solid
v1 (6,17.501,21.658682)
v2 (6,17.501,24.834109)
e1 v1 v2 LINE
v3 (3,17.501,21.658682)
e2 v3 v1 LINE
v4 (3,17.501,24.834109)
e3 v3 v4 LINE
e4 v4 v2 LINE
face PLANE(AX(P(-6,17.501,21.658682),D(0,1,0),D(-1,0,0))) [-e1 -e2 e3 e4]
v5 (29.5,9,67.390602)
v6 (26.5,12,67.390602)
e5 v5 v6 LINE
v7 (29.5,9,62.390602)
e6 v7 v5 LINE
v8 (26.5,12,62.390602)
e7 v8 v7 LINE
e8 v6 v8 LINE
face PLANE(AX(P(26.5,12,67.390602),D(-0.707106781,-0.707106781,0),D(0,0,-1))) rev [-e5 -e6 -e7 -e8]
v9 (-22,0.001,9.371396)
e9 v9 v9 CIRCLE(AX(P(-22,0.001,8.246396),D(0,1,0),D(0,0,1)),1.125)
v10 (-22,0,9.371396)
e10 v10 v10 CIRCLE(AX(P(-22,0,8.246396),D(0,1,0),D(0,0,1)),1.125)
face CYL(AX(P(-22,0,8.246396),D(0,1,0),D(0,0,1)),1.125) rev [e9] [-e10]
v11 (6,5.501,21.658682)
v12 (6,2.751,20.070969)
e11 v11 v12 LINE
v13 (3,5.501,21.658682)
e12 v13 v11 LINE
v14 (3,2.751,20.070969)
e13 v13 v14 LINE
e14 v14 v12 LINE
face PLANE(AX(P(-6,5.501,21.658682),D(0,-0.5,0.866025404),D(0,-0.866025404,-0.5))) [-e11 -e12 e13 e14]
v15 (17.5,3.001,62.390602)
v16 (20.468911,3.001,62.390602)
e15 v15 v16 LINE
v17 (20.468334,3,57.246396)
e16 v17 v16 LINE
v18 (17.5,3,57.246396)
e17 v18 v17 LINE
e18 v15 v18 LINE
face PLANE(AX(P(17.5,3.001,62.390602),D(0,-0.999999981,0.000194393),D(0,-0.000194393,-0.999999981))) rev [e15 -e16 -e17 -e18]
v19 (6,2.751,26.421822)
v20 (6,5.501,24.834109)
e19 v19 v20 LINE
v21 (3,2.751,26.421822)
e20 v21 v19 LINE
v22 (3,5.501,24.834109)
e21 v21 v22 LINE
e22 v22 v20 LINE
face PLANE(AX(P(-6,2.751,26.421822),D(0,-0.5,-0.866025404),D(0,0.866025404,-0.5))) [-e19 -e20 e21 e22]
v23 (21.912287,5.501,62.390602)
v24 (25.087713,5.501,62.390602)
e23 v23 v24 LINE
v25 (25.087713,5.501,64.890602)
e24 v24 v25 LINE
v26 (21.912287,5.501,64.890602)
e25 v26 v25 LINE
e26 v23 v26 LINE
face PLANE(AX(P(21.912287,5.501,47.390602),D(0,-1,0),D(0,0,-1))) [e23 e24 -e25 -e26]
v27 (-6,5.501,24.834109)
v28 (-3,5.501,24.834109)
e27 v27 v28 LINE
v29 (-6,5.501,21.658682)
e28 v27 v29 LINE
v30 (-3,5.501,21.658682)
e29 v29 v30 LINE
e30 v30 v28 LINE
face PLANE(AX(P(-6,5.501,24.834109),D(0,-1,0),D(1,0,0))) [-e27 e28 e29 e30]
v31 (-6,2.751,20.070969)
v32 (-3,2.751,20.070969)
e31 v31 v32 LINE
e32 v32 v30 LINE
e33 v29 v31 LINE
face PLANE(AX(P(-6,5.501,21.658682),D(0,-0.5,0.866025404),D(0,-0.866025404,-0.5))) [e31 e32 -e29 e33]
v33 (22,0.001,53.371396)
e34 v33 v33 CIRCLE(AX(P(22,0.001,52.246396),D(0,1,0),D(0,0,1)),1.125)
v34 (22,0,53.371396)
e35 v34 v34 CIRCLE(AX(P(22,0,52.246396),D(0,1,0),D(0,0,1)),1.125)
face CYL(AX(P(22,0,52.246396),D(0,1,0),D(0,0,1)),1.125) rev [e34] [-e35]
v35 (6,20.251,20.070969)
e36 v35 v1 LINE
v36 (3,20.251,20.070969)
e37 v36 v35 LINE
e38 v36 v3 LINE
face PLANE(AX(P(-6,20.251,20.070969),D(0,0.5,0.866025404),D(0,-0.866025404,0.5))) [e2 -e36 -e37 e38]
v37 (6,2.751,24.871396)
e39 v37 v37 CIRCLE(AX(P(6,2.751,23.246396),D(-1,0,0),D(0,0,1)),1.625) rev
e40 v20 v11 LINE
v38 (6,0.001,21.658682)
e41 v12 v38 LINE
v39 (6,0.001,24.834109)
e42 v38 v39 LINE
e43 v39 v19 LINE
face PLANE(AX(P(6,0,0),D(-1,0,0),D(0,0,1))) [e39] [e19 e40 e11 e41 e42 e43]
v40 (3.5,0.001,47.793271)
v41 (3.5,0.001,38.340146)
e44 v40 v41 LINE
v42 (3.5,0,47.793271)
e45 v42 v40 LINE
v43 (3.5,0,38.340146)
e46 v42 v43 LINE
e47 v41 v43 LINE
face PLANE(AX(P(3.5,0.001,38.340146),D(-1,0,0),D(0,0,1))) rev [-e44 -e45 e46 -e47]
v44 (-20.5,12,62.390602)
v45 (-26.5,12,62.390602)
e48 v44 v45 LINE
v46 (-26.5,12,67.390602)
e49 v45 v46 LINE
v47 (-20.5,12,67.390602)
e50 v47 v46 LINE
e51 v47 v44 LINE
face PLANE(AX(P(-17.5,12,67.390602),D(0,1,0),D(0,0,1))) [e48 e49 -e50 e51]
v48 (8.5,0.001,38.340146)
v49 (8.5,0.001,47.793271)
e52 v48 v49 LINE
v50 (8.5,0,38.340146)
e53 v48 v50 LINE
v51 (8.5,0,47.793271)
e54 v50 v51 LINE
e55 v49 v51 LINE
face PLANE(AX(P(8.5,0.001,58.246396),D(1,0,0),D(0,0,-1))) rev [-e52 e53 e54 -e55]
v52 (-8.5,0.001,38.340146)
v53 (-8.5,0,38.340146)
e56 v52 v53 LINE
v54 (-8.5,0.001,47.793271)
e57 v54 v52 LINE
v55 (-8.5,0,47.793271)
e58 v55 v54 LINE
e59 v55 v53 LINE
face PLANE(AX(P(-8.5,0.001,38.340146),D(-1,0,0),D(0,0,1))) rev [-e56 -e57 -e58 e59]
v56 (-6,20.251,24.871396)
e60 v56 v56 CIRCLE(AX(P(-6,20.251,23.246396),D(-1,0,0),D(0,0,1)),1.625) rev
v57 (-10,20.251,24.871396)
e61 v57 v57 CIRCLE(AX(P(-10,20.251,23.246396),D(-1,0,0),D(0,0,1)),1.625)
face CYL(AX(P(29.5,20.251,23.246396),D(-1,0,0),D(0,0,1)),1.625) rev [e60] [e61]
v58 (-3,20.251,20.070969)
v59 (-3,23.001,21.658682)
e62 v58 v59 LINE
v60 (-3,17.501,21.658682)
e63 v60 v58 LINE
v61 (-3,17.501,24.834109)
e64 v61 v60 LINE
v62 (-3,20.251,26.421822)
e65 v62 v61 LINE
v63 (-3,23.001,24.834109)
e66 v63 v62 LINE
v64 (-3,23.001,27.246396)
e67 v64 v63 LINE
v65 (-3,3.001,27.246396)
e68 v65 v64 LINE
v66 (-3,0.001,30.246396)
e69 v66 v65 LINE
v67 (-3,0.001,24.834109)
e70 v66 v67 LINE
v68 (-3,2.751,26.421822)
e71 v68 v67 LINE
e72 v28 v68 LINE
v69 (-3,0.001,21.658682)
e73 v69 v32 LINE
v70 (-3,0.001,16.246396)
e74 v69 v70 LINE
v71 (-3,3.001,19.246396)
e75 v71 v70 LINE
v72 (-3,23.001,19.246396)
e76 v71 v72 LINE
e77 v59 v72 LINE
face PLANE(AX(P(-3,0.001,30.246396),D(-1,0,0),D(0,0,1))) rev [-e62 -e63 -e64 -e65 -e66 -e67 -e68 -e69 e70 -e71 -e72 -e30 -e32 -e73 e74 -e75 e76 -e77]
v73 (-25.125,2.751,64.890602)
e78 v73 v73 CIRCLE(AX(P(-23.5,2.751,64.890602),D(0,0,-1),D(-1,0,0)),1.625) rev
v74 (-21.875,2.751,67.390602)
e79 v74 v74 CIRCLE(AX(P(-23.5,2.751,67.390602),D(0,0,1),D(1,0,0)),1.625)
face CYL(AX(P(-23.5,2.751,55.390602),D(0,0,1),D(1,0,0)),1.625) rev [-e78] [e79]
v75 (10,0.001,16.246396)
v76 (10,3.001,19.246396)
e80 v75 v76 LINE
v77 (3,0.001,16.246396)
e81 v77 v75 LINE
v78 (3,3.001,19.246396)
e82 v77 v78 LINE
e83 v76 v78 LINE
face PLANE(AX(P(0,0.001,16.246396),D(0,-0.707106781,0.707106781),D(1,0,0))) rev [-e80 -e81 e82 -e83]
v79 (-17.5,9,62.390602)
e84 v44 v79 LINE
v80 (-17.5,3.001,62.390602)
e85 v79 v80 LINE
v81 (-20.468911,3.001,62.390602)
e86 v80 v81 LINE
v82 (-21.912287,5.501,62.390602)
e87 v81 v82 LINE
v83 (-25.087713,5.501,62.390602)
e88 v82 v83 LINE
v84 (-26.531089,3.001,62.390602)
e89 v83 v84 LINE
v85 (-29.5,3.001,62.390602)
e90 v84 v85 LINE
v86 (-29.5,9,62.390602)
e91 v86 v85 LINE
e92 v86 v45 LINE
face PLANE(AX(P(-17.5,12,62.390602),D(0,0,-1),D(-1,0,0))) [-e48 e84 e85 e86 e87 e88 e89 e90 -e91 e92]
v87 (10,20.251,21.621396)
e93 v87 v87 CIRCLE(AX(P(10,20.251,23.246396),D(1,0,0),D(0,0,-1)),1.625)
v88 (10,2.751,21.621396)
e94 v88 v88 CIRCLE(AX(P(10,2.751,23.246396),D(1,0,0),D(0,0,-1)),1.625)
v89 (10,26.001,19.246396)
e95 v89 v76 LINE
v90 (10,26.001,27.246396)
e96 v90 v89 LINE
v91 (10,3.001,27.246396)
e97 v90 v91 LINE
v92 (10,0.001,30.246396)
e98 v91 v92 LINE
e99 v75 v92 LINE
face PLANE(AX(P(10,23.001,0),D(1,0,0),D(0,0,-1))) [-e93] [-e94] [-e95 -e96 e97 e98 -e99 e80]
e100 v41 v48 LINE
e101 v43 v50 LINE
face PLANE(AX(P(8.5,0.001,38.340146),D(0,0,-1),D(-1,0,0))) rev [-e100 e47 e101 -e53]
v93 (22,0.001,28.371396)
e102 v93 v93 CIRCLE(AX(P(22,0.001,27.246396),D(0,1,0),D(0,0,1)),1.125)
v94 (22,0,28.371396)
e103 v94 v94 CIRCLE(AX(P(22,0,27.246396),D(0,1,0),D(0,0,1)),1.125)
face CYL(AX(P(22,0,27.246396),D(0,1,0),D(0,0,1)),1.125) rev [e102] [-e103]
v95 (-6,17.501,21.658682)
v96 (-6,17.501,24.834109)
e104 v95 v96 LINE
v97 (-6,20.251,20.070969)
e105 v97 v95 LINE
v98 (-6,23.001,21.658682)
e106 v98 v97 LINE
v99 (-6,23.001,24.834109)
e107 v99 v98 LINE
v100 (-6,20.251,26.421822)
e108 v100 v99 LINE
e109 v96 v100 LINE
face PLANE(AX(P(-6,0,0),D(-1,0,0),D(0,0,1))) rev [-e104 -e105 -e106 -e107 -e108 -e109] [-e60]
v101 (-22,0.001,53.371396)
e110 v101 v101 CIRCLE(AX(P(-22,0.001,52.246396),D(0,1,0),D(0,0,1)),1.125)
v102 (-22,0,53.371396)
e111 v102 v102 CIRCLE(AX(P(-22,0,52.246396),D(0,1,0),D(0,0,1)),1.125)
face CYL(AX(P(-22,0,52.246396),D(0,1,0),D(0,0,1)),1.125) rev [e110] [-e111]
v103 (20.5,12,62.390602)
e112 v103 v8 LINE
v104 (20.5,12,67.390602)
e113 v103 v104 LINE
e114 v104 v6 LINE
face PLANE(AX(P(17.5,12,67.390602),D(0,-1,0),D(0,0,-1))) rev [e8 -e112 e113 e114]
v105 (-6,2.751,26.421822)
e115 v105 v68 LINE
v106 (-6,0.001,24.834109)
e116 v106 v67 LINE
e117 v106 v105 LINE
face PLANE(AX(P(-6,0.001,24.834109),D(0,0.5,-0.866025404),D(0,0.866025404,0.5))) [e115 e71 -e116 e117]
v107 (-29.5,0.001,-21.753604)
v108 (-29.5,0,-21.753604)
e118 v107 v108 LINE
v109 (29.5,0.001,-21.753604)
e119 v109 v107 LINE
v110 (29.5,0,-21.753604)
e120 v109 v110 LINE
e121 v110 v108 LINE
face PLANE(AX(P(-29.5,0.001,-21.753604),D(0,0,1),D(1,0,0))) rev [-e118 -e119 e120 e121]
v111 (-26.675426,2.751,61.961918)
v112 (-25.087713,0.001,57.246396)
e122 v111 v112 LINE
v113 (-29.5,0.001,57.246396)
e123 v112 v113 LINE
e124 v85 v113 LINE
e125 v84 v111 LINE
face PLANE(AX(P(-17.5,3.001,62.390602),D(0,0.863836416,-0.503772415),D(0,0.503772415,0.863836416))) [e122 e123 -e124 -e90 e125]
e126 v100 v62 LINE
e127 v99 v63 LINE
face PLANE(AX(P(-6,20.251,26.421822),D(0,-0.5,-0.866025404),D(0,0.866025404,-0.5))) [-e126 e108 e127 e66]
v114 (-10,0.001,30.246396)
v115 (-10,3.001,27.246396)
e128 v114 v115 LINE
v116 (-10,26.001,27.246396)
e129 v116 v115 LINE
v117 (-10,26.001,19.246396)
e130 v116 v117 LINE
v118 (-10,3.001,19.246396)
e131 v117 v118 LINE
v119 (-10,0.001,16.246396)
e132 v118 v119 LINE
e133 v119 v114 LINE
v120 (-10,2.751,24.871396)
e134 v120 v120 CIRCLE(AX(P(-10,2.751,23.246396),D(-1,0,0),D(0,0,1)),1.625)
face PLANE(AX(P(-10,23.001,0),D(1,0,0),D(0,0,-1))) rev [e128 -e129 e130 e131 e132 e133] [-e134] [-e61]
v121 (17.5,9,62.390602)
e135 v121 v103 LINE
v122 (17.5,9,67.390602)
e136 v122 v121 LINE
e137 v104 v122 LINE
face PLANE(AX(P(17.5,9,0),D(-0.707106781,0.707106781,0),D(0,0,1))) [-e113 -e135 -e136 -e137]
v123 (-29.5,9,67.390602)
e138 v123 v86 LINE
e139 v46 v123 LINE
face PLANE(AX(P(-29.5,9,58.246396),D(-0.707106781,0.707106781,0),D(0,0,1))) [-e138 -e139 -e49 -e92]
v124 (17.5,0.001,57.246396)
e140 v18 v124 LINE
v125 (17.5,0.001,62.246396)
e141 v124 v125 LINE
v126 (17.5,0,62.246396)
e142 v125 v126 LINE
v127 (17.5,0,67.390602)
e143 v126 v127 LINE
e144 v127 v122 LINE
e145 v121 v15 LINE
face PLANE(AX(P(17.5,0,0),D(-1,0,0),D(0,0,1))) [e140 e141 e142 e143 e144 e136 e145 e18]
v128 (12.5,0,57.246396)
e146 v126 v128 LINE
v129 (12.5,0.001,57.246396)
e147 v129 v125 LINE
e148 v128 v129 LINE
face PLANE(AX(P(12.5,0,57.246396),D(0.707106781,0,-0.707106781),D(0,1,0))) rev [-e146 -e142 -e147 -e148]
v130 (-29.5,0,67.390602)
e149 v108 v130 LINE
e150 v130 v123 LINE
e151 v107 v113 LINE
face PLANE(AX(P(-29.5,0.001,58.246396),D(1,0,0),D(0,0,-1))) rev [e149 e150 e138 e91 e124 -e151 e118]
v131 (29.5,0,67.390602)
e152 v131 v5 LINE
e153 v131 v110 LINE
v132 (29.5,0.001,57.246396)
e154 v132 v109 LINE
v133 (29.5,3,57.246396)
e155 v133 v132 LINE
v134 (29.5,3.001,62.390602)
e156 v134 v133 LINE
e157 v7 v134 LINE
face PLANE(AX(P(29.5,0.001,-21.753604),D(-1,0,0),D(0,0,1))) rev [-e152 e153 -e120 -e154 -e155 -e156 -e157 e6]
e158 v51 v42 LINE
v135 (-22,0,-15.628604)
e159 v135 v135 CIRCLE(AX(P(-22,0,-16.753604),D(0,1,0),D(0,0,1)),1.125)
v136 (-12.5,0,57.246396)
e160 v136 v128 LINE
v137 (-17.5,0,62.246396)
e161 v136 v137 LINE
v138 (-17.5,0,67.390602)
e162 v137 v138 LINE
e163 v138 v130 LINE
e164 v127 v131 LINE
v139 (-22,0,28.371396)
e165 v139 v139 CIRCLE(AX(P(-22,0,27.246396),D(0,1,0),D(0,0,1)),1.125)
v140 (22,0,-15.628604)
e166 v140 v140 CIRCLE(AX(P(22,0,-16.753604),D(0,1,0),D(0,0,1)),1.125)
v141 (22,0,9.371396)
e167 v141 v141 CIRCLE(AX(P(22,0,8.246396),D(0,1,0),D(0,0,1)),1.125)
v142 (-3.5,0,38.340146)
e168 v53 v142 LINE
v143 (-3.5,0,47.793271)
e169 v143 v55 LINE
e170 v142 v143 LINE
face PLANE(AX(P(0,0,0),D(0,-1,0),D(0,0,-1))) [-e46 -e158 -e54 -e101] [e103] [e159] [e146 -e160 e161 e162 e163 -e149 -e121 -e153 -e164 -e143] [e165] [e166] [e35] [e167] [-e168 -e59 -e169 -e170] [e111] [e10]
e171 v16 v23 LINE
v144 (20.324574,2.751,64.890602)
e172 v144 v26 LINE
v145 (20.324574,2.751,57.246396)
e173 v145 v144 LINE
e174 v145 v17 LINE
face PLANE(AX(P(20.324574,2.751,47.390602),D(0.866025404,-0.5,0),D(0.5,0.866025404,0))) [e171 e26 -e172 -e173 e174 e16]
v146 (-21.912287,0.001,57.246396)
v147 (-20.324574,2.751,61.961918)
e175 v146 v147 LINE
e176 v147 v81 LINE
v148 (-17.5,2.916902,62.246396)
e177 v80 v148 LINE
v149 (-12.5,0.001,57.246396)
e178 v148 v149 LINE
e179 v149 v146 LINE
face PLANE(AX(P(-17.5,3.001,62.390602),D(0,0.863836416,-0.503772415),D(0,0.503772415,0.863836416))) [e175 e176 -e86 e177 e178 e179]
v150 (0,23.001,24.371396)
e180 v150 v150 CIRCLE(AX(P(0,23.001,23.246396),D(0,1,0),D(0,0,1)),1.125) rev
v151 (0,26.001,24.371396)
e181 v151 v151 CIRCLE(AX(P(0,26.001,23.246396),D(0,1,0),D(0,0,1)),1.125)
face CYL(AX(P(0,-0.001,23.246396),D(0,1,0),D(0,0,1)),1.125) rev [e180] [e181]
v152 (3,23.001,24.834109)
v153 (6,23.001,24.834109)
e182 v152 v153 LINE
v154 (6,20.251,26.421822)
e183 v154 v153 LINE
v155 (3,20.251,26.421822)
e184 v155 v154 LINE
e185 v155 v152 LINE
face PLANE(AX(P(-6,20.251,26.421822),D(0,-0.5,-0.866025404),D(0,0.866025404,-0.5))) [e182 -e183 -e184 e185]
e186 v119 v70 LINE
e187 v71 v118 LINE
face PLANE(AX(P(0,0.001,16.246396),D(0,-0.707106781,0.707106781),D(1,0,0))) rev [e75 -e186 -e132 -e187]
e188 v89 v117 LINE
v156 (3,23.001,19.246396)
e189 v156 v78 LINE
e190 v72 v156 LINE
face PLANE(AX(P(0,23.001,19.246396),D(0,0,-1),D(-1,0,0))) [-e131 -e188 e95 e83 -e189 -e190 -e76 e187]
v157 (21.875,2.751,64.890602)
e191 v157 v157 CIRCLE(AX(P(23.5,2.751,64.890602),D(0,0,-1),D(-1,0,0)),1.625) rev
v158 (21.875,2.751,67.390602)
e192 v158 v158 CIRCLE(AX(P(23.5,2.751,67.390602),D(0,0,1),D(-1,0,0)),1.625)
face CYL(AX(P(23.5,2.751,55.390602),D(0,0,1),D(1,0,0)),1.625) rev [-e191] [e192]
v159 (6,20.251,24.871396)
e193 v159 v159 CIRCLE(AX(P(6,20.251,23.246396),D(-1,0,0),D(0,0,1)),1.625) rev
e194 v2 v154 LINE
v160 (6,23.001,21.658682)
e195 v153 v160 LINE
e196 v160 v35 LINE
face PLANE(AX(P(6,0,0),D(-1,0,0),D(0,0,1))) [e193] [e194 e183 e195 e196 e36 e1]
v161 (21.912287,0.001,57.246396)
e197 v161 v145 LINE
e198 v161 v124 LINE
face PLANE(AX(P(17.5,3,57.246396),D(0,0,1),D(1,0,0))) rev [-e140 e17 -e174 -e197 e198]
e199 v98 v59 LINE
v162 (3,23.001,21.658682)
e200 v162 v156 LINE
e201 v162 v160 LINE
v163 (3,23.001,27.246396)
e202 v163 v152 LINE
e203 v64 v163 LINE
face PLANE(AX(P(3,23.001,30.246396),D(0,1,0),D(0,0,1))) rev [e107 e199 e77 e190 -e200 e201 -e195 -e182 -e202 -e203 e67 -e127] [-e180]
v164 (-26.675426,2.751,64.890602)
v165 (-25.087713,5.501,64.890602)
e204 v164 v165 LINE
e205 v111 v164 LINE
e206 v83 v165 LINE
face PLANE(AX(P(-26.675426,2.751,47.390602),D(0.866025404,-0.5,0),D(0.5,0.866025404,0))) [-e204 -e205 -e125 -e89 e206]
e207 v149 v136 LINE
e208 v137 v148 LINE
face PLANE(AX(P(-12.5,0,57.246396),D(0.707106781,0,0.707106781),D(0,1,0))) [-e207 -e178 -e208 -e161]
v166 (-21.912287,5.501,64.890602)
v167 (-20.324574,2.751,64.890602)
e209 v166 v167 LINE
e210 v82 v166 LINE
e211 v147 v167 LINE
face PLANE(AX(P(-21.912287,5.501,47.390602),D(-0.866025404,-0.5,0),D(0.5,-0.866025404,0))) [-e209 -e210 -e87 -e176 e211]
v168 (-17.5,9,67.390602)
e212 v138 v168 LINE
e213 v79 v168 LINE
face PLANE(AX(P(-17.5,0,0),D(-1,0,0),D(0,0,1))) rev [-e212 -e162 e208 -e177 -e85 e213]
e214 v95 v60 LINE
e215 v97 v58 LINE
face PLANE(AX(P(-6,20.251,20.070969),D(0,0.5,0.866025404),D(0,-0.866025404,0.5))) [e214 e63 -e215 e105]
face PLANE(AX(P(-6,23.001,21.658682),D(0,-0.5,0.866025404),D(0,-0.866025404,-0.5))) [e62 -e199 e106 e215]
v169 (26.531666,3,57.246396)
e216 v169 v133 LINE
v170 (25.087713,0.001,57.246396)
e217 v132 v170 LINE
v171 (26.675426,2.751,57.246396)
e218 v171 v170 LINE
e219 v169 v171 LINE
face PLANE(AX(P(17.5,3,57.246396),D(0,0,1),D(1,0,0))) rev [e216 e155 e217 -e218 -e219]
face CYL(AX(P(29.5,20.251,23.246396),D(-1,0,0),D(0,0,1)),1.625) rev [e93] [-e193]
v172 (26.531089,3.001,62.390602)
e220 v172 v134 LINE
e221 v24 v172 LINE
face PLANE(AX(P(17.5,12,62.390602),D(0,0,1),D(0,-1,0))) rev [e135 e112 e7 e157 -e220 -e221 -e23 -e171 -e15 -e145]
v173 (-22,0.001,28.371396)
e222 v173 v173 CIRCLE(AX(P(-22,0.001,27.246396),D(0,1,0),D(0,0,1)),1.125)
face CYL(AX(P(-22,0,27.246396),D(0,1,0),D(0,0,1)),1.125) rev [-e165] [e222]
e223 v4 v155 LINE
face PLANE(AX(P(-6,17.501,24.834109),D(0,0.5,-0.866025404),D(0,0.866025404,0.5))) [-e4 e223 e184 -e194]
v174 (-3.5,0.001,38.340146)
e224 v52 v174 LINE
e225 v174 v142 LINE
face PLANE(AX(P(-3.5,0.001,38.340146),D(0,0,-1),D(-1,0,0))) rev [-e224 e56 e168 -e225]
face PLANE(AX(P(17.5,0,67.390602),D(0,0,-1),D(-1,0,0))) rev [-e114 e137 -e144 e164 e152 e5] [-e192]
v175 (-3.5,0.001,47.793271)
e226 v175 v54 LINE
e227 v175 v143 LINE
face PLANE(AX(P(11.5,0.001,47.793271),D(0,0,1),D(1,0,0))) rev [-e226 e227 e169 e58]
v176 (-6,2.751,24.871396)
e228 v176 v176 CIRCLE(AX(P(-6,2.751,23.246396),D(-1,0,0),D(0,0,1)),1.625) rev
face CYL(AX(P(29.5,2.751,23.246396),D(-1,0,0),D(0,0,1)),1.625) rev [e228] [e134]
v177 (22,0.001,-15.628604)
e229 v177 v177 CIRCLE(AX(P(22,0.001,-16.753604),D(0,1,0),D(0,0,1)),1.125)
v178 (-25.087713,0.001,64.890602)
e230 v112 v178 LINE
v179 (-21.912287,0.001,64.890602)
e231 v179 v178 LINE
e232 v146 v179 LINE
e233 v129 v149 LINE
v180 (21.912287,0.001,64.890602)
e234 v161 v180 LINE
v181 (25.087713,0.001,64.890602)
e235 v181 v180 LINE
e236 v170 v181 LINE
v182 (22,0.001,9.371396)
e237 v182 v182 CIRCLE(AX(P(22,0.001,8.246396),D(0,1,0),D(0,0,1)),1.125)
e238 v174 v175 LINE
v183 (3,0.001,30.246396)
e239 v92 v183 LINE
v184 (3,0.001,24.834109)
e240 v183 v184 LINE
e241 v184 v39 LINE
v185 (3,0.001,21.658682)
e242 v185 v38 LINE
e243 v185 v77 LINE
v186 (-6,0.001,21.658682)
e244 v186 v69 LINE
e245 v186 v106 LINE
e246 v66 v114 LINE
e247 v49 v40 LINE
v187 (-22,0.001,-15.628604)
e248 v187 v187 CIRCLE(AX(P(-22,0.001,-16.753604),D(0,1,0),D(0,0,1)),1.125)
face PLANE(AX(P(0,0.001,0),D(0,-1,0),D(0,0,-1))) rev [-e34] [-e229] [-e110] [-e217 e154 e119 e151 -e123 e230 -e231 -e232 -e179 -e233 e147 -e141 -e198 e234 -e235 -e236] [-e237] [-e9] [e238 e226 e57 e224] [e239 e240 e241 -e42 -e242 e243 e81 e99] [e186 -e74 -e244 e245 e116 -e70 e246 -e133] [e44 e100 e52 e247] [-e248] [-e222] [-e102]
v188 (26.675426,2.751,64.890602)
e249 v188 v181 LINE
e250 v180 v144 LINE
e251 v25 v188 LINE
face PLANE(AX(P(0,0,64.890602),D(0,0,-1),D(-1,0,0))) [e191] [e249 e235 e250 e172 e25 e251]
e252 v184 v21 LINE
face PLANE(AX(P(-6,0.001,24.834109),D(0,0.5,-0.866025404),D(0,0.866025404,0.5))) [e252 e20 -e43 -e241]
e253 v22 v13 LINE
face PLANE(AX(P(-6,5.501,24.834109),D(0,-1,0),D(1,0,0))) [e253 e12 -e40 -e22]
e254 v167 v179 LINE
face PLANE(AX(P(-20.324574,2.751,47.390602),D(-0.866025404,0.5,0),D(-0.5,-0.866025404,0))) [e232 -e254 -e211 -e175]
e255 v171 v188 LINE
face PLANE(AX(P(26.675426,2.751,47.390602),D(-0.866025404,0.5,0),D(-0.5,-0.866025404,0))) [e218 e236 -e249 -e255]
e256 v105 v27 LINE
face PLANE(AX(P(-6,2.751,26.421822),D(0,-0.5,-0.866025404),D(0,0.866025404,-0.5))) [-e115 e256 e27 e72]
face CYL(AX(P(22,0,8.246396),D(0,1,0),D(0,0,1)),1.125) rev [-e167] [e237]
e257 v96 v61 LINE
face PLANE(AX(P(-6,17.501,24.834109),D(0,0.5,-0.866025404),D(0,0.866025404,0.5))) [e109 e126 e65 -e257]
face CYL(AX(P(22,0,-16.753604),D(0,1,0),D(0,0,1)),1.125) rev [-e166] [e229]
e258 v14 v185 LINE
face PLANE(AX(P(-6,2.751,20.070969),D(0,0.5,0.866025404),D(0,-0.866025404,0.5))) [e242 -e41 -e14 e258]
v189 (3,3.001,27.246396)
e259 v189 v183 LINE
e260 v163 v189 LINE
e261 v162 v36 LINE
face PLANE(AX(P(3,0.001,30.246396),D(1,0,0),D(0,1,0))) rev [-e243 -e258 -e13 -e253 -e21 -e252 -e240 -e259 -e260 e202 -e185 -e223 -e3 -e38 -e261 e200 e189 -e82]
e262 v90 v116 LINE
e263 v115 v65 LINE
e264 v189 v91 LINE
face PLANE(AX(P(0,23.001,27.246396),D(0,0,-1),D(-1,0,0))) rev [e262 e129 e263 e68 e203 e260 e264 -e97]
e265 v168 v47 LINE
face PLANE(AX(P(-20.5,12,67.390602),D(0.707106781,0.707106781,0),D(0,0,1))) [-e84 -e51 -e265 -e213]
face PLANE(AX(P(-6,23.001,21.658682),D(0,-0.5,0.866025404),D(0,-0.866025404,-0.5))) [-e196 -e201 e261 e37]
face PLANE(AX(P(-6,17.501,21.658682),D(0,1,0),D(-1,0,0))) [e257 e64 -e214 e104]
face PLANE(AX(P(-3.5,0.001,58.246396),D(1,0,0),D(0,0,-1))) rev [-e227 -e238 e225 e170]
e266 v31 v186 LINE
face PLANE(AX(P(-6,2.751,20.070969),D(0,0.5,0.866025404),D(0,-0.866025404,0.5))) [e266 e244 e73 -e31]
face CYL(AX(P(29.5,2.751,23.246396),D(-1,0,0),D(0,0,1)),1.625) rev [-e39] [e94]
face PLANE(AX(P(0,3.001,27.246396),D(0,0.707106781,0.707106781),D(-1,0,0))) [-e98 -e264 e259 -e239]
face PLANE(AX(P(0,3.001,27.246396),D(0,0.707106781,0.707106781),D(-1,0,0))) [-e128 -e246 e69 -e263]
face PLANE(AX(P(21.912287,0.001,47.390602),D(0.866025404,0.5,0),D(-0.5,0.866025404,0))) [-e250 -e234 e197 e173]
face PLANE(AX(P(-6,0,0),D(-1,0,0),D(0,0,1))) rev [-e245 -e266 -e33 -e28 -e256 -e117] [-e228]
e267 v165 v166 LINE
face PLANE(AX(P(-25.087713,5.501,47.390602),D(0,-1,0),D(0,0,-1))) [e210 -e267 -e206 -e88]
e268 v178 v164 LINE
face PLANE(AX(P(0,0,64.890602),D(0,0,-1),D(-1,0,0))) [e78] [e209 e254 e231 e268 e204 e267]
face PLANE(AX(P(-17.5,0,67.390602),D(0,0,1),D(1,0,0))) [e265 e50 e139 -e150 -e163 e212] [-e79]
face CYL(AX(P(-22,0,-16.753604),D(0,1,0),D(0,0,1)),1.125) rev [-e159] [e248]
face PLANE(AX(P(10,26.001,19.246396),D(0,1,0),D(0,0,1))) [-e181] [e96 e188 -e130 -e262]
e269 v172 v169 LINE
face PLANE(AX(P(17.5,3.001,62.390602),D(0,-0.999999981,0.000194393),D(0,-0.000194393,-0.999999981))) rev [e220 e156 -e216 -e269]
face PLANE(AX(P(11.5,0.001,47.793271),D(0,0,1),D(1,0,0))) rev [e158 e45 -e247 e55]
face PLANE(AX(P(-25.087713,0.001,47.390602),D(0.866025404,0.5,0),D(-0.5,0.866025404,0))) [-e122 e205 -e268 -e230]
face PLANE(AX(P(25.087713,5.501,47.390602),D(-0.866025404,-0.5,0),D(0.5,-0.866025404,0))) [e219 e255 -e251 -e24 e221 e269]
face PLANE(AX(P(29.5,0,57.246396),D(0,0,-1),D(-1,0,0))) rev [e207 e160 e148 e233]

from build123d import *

# Parameters (mm, degrees)
BASE_DEPTH                     = 0.001
SKETCH1_W                      = 20
SKETCH1_H                      = 7
SKETCH1_H_2                    = 8
SKETCH1_W_2                    = 7
SKETCH1_H_3                    = 38.5
SOPORTE_MOTORES_DEPTH          = 23
SOPORTE_PALA_DEPTH             = 84.783035433
SKETCH3_R                      = 1.625
AGUJEROS_MOTORES_DEPTH         = 72.406211399
SKETCH4_R                      = 1
AGUJEROS_PALA_DEPTH            = 4
HUECO_SOPORTE_POSTERIOR_DEPTH  = 10
CORTE_SOPORTE_PALA_MOTOR_REACH = 70.026
BOSS_EXTRUDE2_DEPTH            = 20
CHAMFER1_SIZE                  = 3
CORTAR_EXTRUIR1_DEPTH          = 84.783035433
CORTAR_EXTRUIR1_DEPTH_BACK     = 84.783035433
SALIENTE_EXTRUIR1_START        = -59
SALIENTE_EXTRUIR1_DEPTH        = 12
SALIENTE_EXTRUIR2_DEPTH        = 12
CHAFL_N1_SIZE                  = 5
CROQUIS7_R                     = 1.625
CORTAR_EXTRUIR2_DEPTH          = 12
CORTAR_EXTRUIR3_DEPTH          = 15
CORTAR_EXTRUIR3_DEPTH_BACK     = 2.5
CORTAR_EXTRUIR5_DEPTH          = 85.868726303
CORTAR_EXTRUIR5_DEPTH_BACK     = 85.868726303
CROQUIS10_W                    = 13.75510153
CROQUIS10_H                    = 28.013777128
SALIENTE_EXTRUIR3_START        = -20
CROQUIS11_W                    = 8
CROQUIS11_H                    = 3
SALIENTE_EXTRUIR3_DEPTH        = 20
CORTAR_EXTRUIR6_START          = -11
CROQUIS12_W                    = 6
CROQUIS12_H                    = 23
CORTAR_EXTRUIR6_DEPTH          = 14
CORTAR_EXTRUIR7_DEPTH          = 9
CORTAR_EXTRUIR7_DEPTH_BACK     = 3
CHAFL_N2_SIZE                  = 3
CORTAR_EXTRUIR8_REACH          = 70.84
CROQUIS15_R                    = 1.125
CROQUIS16_R                    = 1.125
CORTAR_EXTRUIR9_DEPTH          = 69.839702957


with BuildPart() as part:
    # Croquis1 → Base (new body)
    with BuildSketch(Plane(origin=(0, 0, 10.887020736), x_dir=(1, 0, 0), z_dir=(0, 1, 0))):
        Polygon((-29.5, 32.640625), (29.5, 32.640625), (29.5, -47.359375), (8.5, -47.359375), (8.5, -27.453125), (3.5, -27.453125), (3.5, -47.359375), (-3.5, -47.359375), (-3.5, -27.453125), (-8.5, -27.453125), (-8.5, -47.359375), (-29.5, -47.359375), align=None)
    extrude(amount=BASE_DEPTH)

    # Sketch1 → Soporte Motores (add)
    with BuildSketch(Plane(origin=(0, 0.001, 10.887020736), x_dir=(1, 0, 0), z_dir=(0, 1, 0))):
        with Locations((0, 19.640625)):
            Rectangle(SKETCH1_W, SKETCH1_H)
        with Locations((0, -12.359375)):
            Rectangle(SKETCH1_W, SKETCH1_H_2)
        with Locations((0, -35.609375)):
            Rectangle(SKETCH1_W_2, SKETCH1_H_3)
    extrude(amount=SOPORTE_MOTORES_DEPTH)

    # Sketch2 → Soporte Pala (cut, through all)
    with BuildSketch(Plane(origin=(29.5, 0, 10.887020736), x_dir=(0, 0, -1), z_dir=(1, 0, 0))):
        Polygon((-54.859375, 23.001), (-46.359375, 0), (-47.359375, 0), (-47.359375, 0.001), (-54.859375, 0.001), align=None)
    extrude(amount=-SOPORTE_PALA_DEPTH, mode=Mode.SUBTRACT)

    # Sketch3 → Agujeros Motores (cut, through all)
    with BuildSketch(Plane(origin=(-10, 0, 10.887020736), x_dir=(0, 0, 1), z_dir=(-1, 0, 0))):
        with Locations((12.359375, 2.751)):
            Circle(SKETCH3_R)
        with Locations((12.359375, 20.251)):
            Circle(SKETCH3_R)
    extrude(amount=-AGUJEROS_MOTORES_DEPTH, mode=Mode.SUBTRACT)

    # Sketch4 → Agujeros pala (cut)
    with BuildSketch(Plane(origin=(0, -15.440118905, 51.540512919), x_dir=(1, 0, 0), z_dir=(0, -0.34663688071515025, 0.9379993992151973))):
        with Locations(Location((0, 21.460691678, 0), (0, 0, 270))):
            Circle(SKETCH4_R)
        with Locations(Location((0, 31.460691678, 0), (0, 0, 270))):
            Circle(SKETCH4_R)
    extrude(amount=-AGUJEROS_PALA_DEPTH, mode=Mode.SUBTRACT)

    # Croquis2 → Hueco Soporte Posterior (cut)
    with BuildSketch(Plane(origin=(0, 0, -12.253604264), x_dir=(-1, 0, 0), z_dir=(0, 0, -1))):
        Polygon((-5, 6), (-5, 0.001), (5, 0.001), (5, 3.001), (5, 18.001), (-5, 18.001), align=None)
    extrude(amount=-HUECO_SOPORTE_POSTERIOR_DEPTH, mode=Mode.SUBTRACT)

    # Croquis3 → Corte_Soporte_PALA_MOTOR (cut, up to next)
    with BuildSketch(Plane(origin=(-3.5, 0, 10.887020736), x_dir=(0, 0, 1), z_dir=(-1, 0, 0)), mode=Mode.PRIVATE) as corte_soporte_pala_motor_sk1:
        Polygon((21.90625, 0.001), (36.90625, 0.001), (36.90625, 23.001), (21.90625, 23.001), (16.359375, 23.001), (16.359375, 0.001), align=None)
    corte_soporte_pala_motor_tool1 = extrude(corte_soporte_pala_motor_sk1.sketch, amount=-CORTE_SOPORTE_PALA_MOTOR_REACH, mode=Mode.PRIVATE) & part.part
    add(corte_soporte_pala_motor_tool1.solids().sort_by_distance((-3.5, 11.501, 37.519833))[0], mode=Mode.SUBTRACT)

    # Sketch5 → Boss-Extrude2 (add)
    with BuildSketch(Plane(origin=(-8.5, 0, 10.887020736), x_dir=(0, 0, -1), z_dir=(1, 0, 0))):
        Polygon((-36.90625, 0.001), (-36.90625, 0), (-46.359375, 0), (-46.359744549, 0.001), align=None)
    extrude(amount=BOSS_EXTRUDE2_DEPTH)

    # Chamfer1
    # the kernel refuses this chamfer: 3 mm, written as the material it adds along each edge
    with BuildSketch(Plane(origin=(10, 0.001, -5.253604264), x_dir=(0, -0.027495876610586372, 0.9996219169112968), z_dir=(-1, 0, 0)), Plane(origin=(5, 0.001, -12.253604264), x_dir=(0, -0.02749587661058642, -0.9996219169112968), z_dir=(1, 0, 0)), Plane(origin=(-5, 0.001, -5.253604264), x_dir=(0, -0.027495876610586372, 0.9996219169112968), z_dir=(-1, 0, 0)), Plane(origin=(-10, 0.001, -12.253604264), x_dir=(0, -0.02749587661058642, -0.9996219169112968), z_dir=(1, 0, 0))) as chamfer1_piece_1:
        Polygon((CHAMFER1_SIZE * 0.999621916911, CHAMFER1_SIZE * 0.0274958766106), (-CHAMFER1_SIZE * 0.0274958766106, CHAMFER1_SIZE * 0.999621916911), (0, 0), align=None)
    extrude(amount=5)
    with BuildSketch(Plane(origin=(-5, 0.001, -12.253604264), x_dir=(0.9996219169112968, -0.027495876610586372, 0), z_dir=(0, 0, 1))) as chamfer1_piece_2:
        Polygon((CHAMFER1_SIZE * 0.999621916911, CHAMFER1_SIZE * 0.0274958766106), (-CHAMFER1_SIZE * 0.0274958766106, CHAMFER1_SIZE * 0.999621916911), (0, 0), align=None)
    extrude(amount=7)
    with BuildSketch(Plane(origin=(5, 0.001, -12.253604264), x_dir=(-0.9996219169112968, -0.02749587661058637, 0), z_dir=(0, 0, 1))) as chamfer1_piece_3:
        Polygon((CHAMFER1_SIZE * 0.999621916911, -CHAMFER1_SIZE * 0.0274958766106), (-CHAMFER1_SIZE * 0.0274958766106, -CHAMFER1_SIZE * 0.999621916911), (0, 0), align=None)
    extrude(amount=7)
    with BuildSketch(Plane(origin=(-3.5, 0.001, 64.961814249), x_dir=(-0.9996219169112969, -0.027495876610586372, 0), z_dir=(0, 0, -1))) as chamfer1_piece_4_section:
        Polygon((CHAMFER1_SIZE * 0.999621916911, CHAMFER1_SIZE * 0.0274958766106), (-CHAMFER1_SIZE * 0.0274958766106, CHAMFER1_SIZE * 0.999621916911), (0, 0), align=None)
    chamfer1_piece_4 = extrude(amount=17.168543513, mode=Mode.PRIVATE)
    chamfer1_piece_4 = split(chamfer1_piece_4, bisect_by=Plane(origin=(-4.440250326, -0.54073931, 57.046565984), z_dir=(0, 0.34663688071515014, -0.9379993992151971)), keep=Keep.TOP, mode=Mode.PRIVATE)
    chamfer1_piece_4 = split(chamfer1_piece_4, bisect_by=Plane(origin=(-4.440250326, 0, 52.715647697), z_dir=(0, 1, 0)), keep=Keep.TOP, mode=Mode.PRIVATE)
    add(chamfer1_piece_4)
    with BuildSketch(Plane(origin=(3.5, 0.001, 47.793270736), x_dir=(0.9996219169112969, -0.027495876610586372, 0), z_dir=(0, 0, 1))) as chamfer1_piece_5_section:
        Polygon((CHAMFER1_SIZE * 0.999621916911, CHAMFER1_SIZE * 0.0274958766106), (-CHAMFER1_SIZE * 0.0274958766106, CHAMFER1_SIZE * 0.999621916911), (0, 0), align=None)
    chamfer1_piece_5 = extrude(amount=17.168543513, mode=Mode.PRIVATE)
    chamfer1_piece_5 = split(chamfer1_piece_5, bisect_by=Plane(origin=(4.440250326, -0.54073931, 57.046565984), z_dir=(0, 0.34663688071515014, -0.9379993992151971)), keep=Keep.TOP, mode=Mode.PRIVATE)
    chamfer1_piece_5 = split(chamfer1_piece_5, bisect_by=Plane(origin=(4.440250326, 0, 52.715647697), z_dir=(0, 1, 0)), keep=Keep.TOP, mode=Mode.PRIVATE)
    add(chamfer1_piece_5)
    with BuildSketch(Plane(origin=(-10, 0.001, 19.246395736), x_dir=(0, -0.02749587661058636, -0.9996219169112968), z_dir=(1, 0, 0)), Plane(origin=(10, 0.001, 27.246395736), x_dir=(0, -0.02749587661058636, 0.9996219169112968), z_dir=(-1, 0, 0))) as chamfer1_piece_6:
        Polygon((CHAMFER1_SIZE * 0.999621916911, CHAMFER1_SIZE * 0.0274958766106), (-CHAMFER1_SIZE * 0.0274958766106, CHAMFER1_SIZE * 0.999621916911), (0, 0), align=None)
    extrude(amount=20)
    with BuildSketch(Plane(origin=(5, 0.001, -12.253604264), x_dir=(-0.9996219169112968, -0.02749587661058637, 0), z_dir=(0, 0, 1))) as chamfer1_piece_7a_section:
        Polygon((CHAMFER1_SIZE * 0.999621916911, -CHAMFER1_SIZE * 0.0274958766106), (-CHAMFER1_SIZE * 0.0274958766106, -CHAMFER1_SIZE * 0.999621916911), (0, 0), align=None)
    chamfer1_piece_7a = extrude(amount=14.715048964, mode=Mode.PRIVATE)
    chamfer1_piece_7a = split(chamfer1_piece_7a, bisect_by=Plane(origin=(4.01061912, 0.99038088, -5.253604264), z_dir=(0, 0, 1)), keep=Keep.TOP, mode=Mode.PRIVATE)
    with BuildSketch(Plane(origin=(10, 0.001, -5.253604264), x_dir=(0, -0.027495876610586372, 0.9996219169112968), z_dir=(-1, 0, 0))) as chamfer1_piece_7b_section:
        Polygon((CHAMFER1_SIZE * 0.999621916911, CHAMFER1_SIZE * 0.0274958766106), (-CHAMFER1_SIZE * 0.0274958766106, CHAMFER1_SIZE * 0.999621916911), (0, 0), align=None)
    chamfer1_piece_7b = extrude(amount=12.715048964, mode=Mode.PRIVATE)
    chamfer1_piece_7b = split(chamfer1_piece_7b, bisect_by=Plane(origin=(5, 0.99038088, -4.264223383), z_dir=(-1, 0, 0)), keep=Keep.TOP, mode=Mode.PRIVATE)
    chamfer1_piece_7 = chamfer1_piece_7a & chamfer1_piece_7b
    add(chamfer1_piece_7)
    with BuildSketch(Plane(origin=(-2.715048964, 0.001, -12.253604264), x_dir=(0, -0.027495876610586358, -0.9996219169112968), z_dir=(1, 0, 0))) as chamfer1_piece_8a_section:
        Polygon((CHAMFER1_SIZE * 0.999621916911, CHAMFER1_SIZE * 0.0274958766106), (-CHAMFER1_SIZE * 0.0274958766106, CHAMFER1_SIZE * 0.999621916911), (0, 0), align=None)
    chamfer1_piece_8a = extrude(amount=12.715048964, mode=Mode.PRIVATE)
    chamfer1_piece_8a = split(chamfer1_piece_8a, bisect_by=Plane(origin=(5, 0.99038088, -13.242985144), z_dir=(-1, 0, 0)), keep=Keep.TOP, mode=Mode.PRIVATE)
    with BuildSketch(Plane(origin=(5, 0.001, -19.968653228), x_dir=(-0.9996219169112968, -0.02749587661058637, 0), z_dir=(0, 0, 1))) as chamfer1_piece_8b_section:
        Polygon((CHAMFER1_SIZE * 0.999621916911, -CHAMFER1_SIZE * 0.0274958766106), (-CHAMFER1_SIZE * 0.0274958766106, -CHAMFER1_SIZE * 0.999621916911), (0, 0), align=None)
    chamfer1_piece_8b = extrude(amount=14.715048964, mode=Mode.PRIVATE)
    chamfer1_piece_8b = split(chamfer1_piece_8b, bisect_by=Plane(origin=(4.01061912, 0.99038088, -12.253604264), z_dir=(0, 0, -1)), keep=Keep.TOP, mode=Mode.PRIVATE)
    chamfer1_piece_8 = chamfer1_piece_8a & chamfer1_piece_8b
    add(chamfer1_piece_8)
    with BuildSketch(Plane(origin=(-10, 0.001, -12.253604264), x_dir=(0, -0.02749587661058642, -0.9996219169112968), z_dir=(1, 0, 0))) as chamfer1_piece_9a_section:
        Polygon((CHAMFER1_SIZE * 0.999621916911, CHAMFER1_SIZE * 0.0274958766106), (-CHAMFER1_SIZE * 0.0274958766106, CHAMFER1_SIZE * 0.999621916911), (0, 0), align=None)
    chamfer1_piece_9a = extrude(amount=12.715048964, mode=Mode.PRIVATE)
    chamfer1_piece_9a = split(chamfer1_piece_9a, bisect_by=Plane(origin=(-5, 0.99038088, -13.242985144), z_dir=(1, 0, 0)), keep=Keep.TOP, mode=Mode.PRIVATE)
    with BuildSketch(Plane(origin=(-5, 0.001, -19.968653228), x_dir=(0.9996219169112968, -0.027495876610586372, 0), z_dir=(0, 0, 1))) as chamfer1_piece_9b_section:
        Polygon((CHAMFER1_SIZE * 0.999621916911, CHAMFER1_SIZE * 0.0274958766106), (-CHAMFER1_SIZE * 0.0274958766106, CHAMFER1_SIZE * 0.999621916911), (0, 0), align=None)
    chamfer1_piece_9b = extrude(amount=14.715048964, mode=Mode.PRIVATE)
    chamfer1_piece_9b = split(chamfer1_piece_9b, bisect_by=Plane(origin=(-4.01061912, 0.99038088, -12.253604264), z_dir=(0, 0, -1)), keep=Keep.TOP, mode=Mode.PRIVATE)
    chamfer1_piece_9 = chamfer1_piece_9a & chamfer1_piece_9b
    add(chamfer1_piece_9)
    with BuildSketch(Plane(origin=(2.715048964, 0.001, -5.253604264), x_dir=(0, -0.027495876610586372, 0.9996219169112968), z_dir=(-1, 0, 0))) as chamfer1_piece_10a_section:
        Polygon((CHAMFER1_SIZE * 0.999621916911, CHAMFER1_SIZE * 0.0274958766106), (-CHAMFER1_SIZE * 0.0274958766106, CHAMFER1_SIZE * 0.999621916911), (0, 0), align=None)
    chamfer1_piece_10a = extrude(amount=12.715048964, mode=Mode.PRIVATE)
    chamfer1_piece_10a = split(chamfer1_piece_10a, bisect_by=Plane(origin=(-5, 0.99038088, -4.264223383), z_dir=(1, 0, 0)), keep=Keep.TOP, mode=Mode.PRIVATE)
    with BuildSketch(Plane(origin=(-5, 0.001, -12.253604264), x_dir=(0.9996219169112968, -0.027495876610586372, 0), z_dir=(0, 0, 1))) as chamfer1_piece_10b_section:
        Polygon((CHAMFER1_SIZE * 0.999621916911, CHAMFER1_SIZE * 0.0274958766106), (-CHAMFER1_SIZE * 0.0274958766106, CHAMFER1_SIZE * 0.999621916911), (0, 0), align=None)
    chamfer1_piece_10b = extrude(amount=14.715048964, mode=Mode.PRIVATE)
    chamfer1_piece_10b = split(chamfer1_piece_10b, bisect_by=Plane(origin=(-4.01061912, 0.99038088, -5.253604264), z_dir=(0, 0, 1)), keep=Keep.TOP, mode=Mode.PRIVATE)
    chamfer1_piece_10 = chamfer1_piece_10a & chamfer1_piece_10b
    add(chamfer1_piece_10)

    # Croquis4 → Cortar-Extruir1 (cut, two sides: drawn at the far end of the back side and taken through both)
    with BuildSketch(Plane(origin=(-29.5, 0, 10.887020736), x_dir=(0, 0, 1), z_dir=(-1, 0, 0)).offset(-CORTAR_EXTRUIR1_DEPTH_BACK)):
        Polygon((36.90625, 23.001), (36.90625, 0.001), (46.359375, 0.001), (46.359375, 0), (54.859375, 23.001), align=None)
    extrude(amount=CORTAR_EXTRUIR1_DEPTH + CORTAR_EXTRUIR1_DEPTH_BACK, mode=Mode.SUBTRACT)

    # Croquis5 → Saliente-Extruir1 (add)
    with BuildSketch(Plane(origin=(-29.5, 0, 10.887020736), x_dir=(0, 0, 1), z_dir=(-1, 0, 0)).offset(SALIENTE_EXTRUIR1_START)):
        Polygon((46.359375, 0), (56.503581331, 0), (56.503581331, 12), (51.503581331, 12), (51.503581331, 3.001), (46.359375, 3), align=None)
    extrude(amount=SALIENTE_EXTRUIR1_DEPTH)

    # Croquis6 → Saliente-Extruir2 (add)
    with BuildSketch(Plane(origin=(-29.5, 0, 10.887020736), x_dir=(0, 0, 1), z_dir=(-1, 0, 0))):
        Polygon((46.359375, 0.001), (46.359375, 0), (56.503581331, 0), (56.503581331, 12), (51.503581331, 12), (51.503581331, 3.001), align=None)
    extrude(amount=-SALIENTE_EXTRUIR2_DEPTH)

    # Chaflán1
    chafl_n1_edges = [part.edges().sort_by_distance(p)[0] for p in [
        (-17.5, 0.0005, 57.246395736),
        (17.5, 0.0005, 57.246395736),
    ]]
    chamfer(chafl_n1_edges, length=CHAFL_N1_SIZE)

    # Croquis7 → Cortar-Extruir2 (cut)
    with BuildSketch(Plane.XY.offset(67.390602068)):
        with Locations((-23.5, 2.751)):
            Circle(CROQUIS7_R)
        with Locations(Location((23.5, 2.751, 0), (0, 0, 8.814201063))):
            Circle(CROQUIS7_R)
    extrude(amount=-CORTAR_EXTRUIR2_DEPTH, mode=Mode.SUBTRACT)

    # Croquis8 → Cortar-Extruir3 (cut, two sides: drawn at the far end of the back side and taken through both)
    with BuildSketch(Plane(origin=(0, 0, 62.390602068), x_dir=(-1, 0, 0), z_dir=(0, 0, -1)).offset(-CORTAR_EXTRUIR3_DEPTH_BACK)):
        Polygon((-21.91228676, 0.001), (-20.324573519, 2.751), (-21.91228676, 5.501), (-25.08771324, 5.501), (-26.675426481, 2.751), (-25.08771324, 0.001), align=None)
        Polygon((25.08771324, 0.001), (26.675426481, 2.751), (25.08771324, 5.501), (21.91228676, 5.501), (20.324573519, 2.751), (21.91228676, 0.001), align=None)
    extrude(amount=CORTAR_EXTRUIR3_DEPTH + CORTAR_EXTRUIR3_DEPTH_BACK, mode=Mode.SUBTRACT)

    # Croquis10 → Cortar-Extruir5 (cut, two sides: drawn at the far end of the back side and taken through both)
    with BuildSketch(Plane(origin=(-29.5, 0, 10.887020736), x_dir=(0, 0, 1), z_dir=(-1, 0, 0)).offset(-CORTAR_EXTRUIR5_DEPTH_BACK)):
        with Locations((-19.263074235, 14.007888564)):
            Rectangle(CROQUIS10_W, CROQUIS10_H)
    extrude(amount=CORTAR_EXTRUIR5_DEPTH + CORTAR_EXTRUIR5_DEPTH_BACK, mode=Mode.SUBTRACT)

    # Croquis11 → Saliente-Extruir3 (add)
    with BuildSketch(Plane(origin=(-10, 0, 10.887020736), x_dir=(0, 0, 1), z_dir=(-1, 0, 0)).offset(SALIENTE_EXTRUIR3_START)):
        with Locations((12.359375, 24.501)):
            Rectangle(CROQUIS11_W, CROQUIS11_H)
    extrude(amount=SALIENTE_EXTRUIR3_DEPTH)

    # Croquis12 → Cortar-Extruir6 (cut)
    with BuildSketch(Plane(origin=(0, 0, 19.246395736), x_dir=(-1, 0, 0), z_dir=(0, 0, -1)).offset(CORTAR_EXTRUIR6_START)):
        with Locations((0, 11.501)):
            Rectangle(CROQUIS12_W, CROQUIS12_H)
    extrude(amount=CORTAR_EXTRUIR6_DEPTH, mode=Mode.SUBTRACT)

    # Croquis13 → Cortar-Extruir7 (cut, two sides: drawn at the far end of the back side and taken through both)
    with BuildSketch(Plane(origin=(3, 0, 10.887020736), x_dir=(0, 0, 1), z_dir=(-1, 0, 0)).offset(-CORTAR_EXTRUIR7_DEPTH_BACK)):
        Polygon((13.94708824, 0.001), (15.534801481, 2.751), (13.94708824, 5.501), (10.77166176, 5.501), (9.183948519, 2.751), (10.77166176, 0.001), align=None)
        Polygon((13.94708824, 17.501), (15.534801481, 20.251), (13.94708824, 23.001), (10.77166176, 23.001), (9.183948519, 20.251), (10.77166176, 17.501), align=None)
    extrude(amount=CORTAR_EXTRUIR7_DEPTH + CORTAR_EXTRUIR7_DEPTH_BACK, mode=Mode.SUBTRACT)

    # Chaflán2
    chafl_n2_edges = [part.edges().sort_by_distance(p)[0] for p in [
        (29.5, 12, 64.890602068),
        (17.5, 12, 64.890602068),
        (-17.5, 12, 64.890602068),
        (-29.5, 12, 64.890602068),
    ]]
    chamfer(chafl_n2_edges, length=CHAFL_N2_SIZE)

    # Croquis15 → Cortar-Extruir8 (cut, up to next)
    with BuildSketch(Plane(origin=(0, 26.001, 10.887020736), x_dir=(1, 0, 0), z_dir=(0, 1, 0)), mode=Mode.PRIVATE) as cortar_extruir8_sk1:
        with Locations(Location((0, -12.359375, 0), (0, 0, 270))):
            Circle(CROQUIS15_R)
    cortar_extruir8_tool1 = extrude(cortar_extruir8_sk1.sketch, amount=-CORTAR_EXTRUIR8_REACH, mode=Mode.PRIVATE) & part.part
    add(cortar_extruir8_tool1.solids().sort_by_distance((0, 26.001, 23.246396))[0], mode=Mode.SUBTRACT)

    # Croquis16 → Cortar-Extruir9 (cut, through all)
    with BuildSketch(Plane(origin=(0, 0.001, 10.887020736), x_dir=(1, 0, 0), z_dir=(0, 1, 0))):
        with Locations(Location((-22, -41.359375, 0), (0, 0, 270))):
            Circle(CROQUIS16_R)
        with Locations(Location((22, -41.359375, 0), (0, 0, 270))):
            Circle(CROQUIS16_R)
        with Locations(Location((-22, 2.640625, 0), (0, 0, 270))):
            Circle(CROQUIS16_R)
        with Locations(Location((22, 2.640625, 0), (0, 0, 270))):
            Circle(CROQUIS16_R)
        with Locations(Location((-22, 27.640625, 0), (0, 0, 270))):
            Circle(CROQUIS16_R)
        with Locations(Location((22, 27.640625, 0), (0, 0, 270))):
            Circle(CROQUIS16_R)
        with Locations(Location((-22, -16.359375, 0), (0, 0, 270))):
            Circle(CROQUIS16_R)
        with Locations(Location((22, -16.359375, 0), (0, 0, 270))):
            Circle(CROQUIS16_R)
    extrude(amount=-CORTAR_EXTRUIR9_DEPTH, mode=Mode.SUBTRACT)


solid = part.part
